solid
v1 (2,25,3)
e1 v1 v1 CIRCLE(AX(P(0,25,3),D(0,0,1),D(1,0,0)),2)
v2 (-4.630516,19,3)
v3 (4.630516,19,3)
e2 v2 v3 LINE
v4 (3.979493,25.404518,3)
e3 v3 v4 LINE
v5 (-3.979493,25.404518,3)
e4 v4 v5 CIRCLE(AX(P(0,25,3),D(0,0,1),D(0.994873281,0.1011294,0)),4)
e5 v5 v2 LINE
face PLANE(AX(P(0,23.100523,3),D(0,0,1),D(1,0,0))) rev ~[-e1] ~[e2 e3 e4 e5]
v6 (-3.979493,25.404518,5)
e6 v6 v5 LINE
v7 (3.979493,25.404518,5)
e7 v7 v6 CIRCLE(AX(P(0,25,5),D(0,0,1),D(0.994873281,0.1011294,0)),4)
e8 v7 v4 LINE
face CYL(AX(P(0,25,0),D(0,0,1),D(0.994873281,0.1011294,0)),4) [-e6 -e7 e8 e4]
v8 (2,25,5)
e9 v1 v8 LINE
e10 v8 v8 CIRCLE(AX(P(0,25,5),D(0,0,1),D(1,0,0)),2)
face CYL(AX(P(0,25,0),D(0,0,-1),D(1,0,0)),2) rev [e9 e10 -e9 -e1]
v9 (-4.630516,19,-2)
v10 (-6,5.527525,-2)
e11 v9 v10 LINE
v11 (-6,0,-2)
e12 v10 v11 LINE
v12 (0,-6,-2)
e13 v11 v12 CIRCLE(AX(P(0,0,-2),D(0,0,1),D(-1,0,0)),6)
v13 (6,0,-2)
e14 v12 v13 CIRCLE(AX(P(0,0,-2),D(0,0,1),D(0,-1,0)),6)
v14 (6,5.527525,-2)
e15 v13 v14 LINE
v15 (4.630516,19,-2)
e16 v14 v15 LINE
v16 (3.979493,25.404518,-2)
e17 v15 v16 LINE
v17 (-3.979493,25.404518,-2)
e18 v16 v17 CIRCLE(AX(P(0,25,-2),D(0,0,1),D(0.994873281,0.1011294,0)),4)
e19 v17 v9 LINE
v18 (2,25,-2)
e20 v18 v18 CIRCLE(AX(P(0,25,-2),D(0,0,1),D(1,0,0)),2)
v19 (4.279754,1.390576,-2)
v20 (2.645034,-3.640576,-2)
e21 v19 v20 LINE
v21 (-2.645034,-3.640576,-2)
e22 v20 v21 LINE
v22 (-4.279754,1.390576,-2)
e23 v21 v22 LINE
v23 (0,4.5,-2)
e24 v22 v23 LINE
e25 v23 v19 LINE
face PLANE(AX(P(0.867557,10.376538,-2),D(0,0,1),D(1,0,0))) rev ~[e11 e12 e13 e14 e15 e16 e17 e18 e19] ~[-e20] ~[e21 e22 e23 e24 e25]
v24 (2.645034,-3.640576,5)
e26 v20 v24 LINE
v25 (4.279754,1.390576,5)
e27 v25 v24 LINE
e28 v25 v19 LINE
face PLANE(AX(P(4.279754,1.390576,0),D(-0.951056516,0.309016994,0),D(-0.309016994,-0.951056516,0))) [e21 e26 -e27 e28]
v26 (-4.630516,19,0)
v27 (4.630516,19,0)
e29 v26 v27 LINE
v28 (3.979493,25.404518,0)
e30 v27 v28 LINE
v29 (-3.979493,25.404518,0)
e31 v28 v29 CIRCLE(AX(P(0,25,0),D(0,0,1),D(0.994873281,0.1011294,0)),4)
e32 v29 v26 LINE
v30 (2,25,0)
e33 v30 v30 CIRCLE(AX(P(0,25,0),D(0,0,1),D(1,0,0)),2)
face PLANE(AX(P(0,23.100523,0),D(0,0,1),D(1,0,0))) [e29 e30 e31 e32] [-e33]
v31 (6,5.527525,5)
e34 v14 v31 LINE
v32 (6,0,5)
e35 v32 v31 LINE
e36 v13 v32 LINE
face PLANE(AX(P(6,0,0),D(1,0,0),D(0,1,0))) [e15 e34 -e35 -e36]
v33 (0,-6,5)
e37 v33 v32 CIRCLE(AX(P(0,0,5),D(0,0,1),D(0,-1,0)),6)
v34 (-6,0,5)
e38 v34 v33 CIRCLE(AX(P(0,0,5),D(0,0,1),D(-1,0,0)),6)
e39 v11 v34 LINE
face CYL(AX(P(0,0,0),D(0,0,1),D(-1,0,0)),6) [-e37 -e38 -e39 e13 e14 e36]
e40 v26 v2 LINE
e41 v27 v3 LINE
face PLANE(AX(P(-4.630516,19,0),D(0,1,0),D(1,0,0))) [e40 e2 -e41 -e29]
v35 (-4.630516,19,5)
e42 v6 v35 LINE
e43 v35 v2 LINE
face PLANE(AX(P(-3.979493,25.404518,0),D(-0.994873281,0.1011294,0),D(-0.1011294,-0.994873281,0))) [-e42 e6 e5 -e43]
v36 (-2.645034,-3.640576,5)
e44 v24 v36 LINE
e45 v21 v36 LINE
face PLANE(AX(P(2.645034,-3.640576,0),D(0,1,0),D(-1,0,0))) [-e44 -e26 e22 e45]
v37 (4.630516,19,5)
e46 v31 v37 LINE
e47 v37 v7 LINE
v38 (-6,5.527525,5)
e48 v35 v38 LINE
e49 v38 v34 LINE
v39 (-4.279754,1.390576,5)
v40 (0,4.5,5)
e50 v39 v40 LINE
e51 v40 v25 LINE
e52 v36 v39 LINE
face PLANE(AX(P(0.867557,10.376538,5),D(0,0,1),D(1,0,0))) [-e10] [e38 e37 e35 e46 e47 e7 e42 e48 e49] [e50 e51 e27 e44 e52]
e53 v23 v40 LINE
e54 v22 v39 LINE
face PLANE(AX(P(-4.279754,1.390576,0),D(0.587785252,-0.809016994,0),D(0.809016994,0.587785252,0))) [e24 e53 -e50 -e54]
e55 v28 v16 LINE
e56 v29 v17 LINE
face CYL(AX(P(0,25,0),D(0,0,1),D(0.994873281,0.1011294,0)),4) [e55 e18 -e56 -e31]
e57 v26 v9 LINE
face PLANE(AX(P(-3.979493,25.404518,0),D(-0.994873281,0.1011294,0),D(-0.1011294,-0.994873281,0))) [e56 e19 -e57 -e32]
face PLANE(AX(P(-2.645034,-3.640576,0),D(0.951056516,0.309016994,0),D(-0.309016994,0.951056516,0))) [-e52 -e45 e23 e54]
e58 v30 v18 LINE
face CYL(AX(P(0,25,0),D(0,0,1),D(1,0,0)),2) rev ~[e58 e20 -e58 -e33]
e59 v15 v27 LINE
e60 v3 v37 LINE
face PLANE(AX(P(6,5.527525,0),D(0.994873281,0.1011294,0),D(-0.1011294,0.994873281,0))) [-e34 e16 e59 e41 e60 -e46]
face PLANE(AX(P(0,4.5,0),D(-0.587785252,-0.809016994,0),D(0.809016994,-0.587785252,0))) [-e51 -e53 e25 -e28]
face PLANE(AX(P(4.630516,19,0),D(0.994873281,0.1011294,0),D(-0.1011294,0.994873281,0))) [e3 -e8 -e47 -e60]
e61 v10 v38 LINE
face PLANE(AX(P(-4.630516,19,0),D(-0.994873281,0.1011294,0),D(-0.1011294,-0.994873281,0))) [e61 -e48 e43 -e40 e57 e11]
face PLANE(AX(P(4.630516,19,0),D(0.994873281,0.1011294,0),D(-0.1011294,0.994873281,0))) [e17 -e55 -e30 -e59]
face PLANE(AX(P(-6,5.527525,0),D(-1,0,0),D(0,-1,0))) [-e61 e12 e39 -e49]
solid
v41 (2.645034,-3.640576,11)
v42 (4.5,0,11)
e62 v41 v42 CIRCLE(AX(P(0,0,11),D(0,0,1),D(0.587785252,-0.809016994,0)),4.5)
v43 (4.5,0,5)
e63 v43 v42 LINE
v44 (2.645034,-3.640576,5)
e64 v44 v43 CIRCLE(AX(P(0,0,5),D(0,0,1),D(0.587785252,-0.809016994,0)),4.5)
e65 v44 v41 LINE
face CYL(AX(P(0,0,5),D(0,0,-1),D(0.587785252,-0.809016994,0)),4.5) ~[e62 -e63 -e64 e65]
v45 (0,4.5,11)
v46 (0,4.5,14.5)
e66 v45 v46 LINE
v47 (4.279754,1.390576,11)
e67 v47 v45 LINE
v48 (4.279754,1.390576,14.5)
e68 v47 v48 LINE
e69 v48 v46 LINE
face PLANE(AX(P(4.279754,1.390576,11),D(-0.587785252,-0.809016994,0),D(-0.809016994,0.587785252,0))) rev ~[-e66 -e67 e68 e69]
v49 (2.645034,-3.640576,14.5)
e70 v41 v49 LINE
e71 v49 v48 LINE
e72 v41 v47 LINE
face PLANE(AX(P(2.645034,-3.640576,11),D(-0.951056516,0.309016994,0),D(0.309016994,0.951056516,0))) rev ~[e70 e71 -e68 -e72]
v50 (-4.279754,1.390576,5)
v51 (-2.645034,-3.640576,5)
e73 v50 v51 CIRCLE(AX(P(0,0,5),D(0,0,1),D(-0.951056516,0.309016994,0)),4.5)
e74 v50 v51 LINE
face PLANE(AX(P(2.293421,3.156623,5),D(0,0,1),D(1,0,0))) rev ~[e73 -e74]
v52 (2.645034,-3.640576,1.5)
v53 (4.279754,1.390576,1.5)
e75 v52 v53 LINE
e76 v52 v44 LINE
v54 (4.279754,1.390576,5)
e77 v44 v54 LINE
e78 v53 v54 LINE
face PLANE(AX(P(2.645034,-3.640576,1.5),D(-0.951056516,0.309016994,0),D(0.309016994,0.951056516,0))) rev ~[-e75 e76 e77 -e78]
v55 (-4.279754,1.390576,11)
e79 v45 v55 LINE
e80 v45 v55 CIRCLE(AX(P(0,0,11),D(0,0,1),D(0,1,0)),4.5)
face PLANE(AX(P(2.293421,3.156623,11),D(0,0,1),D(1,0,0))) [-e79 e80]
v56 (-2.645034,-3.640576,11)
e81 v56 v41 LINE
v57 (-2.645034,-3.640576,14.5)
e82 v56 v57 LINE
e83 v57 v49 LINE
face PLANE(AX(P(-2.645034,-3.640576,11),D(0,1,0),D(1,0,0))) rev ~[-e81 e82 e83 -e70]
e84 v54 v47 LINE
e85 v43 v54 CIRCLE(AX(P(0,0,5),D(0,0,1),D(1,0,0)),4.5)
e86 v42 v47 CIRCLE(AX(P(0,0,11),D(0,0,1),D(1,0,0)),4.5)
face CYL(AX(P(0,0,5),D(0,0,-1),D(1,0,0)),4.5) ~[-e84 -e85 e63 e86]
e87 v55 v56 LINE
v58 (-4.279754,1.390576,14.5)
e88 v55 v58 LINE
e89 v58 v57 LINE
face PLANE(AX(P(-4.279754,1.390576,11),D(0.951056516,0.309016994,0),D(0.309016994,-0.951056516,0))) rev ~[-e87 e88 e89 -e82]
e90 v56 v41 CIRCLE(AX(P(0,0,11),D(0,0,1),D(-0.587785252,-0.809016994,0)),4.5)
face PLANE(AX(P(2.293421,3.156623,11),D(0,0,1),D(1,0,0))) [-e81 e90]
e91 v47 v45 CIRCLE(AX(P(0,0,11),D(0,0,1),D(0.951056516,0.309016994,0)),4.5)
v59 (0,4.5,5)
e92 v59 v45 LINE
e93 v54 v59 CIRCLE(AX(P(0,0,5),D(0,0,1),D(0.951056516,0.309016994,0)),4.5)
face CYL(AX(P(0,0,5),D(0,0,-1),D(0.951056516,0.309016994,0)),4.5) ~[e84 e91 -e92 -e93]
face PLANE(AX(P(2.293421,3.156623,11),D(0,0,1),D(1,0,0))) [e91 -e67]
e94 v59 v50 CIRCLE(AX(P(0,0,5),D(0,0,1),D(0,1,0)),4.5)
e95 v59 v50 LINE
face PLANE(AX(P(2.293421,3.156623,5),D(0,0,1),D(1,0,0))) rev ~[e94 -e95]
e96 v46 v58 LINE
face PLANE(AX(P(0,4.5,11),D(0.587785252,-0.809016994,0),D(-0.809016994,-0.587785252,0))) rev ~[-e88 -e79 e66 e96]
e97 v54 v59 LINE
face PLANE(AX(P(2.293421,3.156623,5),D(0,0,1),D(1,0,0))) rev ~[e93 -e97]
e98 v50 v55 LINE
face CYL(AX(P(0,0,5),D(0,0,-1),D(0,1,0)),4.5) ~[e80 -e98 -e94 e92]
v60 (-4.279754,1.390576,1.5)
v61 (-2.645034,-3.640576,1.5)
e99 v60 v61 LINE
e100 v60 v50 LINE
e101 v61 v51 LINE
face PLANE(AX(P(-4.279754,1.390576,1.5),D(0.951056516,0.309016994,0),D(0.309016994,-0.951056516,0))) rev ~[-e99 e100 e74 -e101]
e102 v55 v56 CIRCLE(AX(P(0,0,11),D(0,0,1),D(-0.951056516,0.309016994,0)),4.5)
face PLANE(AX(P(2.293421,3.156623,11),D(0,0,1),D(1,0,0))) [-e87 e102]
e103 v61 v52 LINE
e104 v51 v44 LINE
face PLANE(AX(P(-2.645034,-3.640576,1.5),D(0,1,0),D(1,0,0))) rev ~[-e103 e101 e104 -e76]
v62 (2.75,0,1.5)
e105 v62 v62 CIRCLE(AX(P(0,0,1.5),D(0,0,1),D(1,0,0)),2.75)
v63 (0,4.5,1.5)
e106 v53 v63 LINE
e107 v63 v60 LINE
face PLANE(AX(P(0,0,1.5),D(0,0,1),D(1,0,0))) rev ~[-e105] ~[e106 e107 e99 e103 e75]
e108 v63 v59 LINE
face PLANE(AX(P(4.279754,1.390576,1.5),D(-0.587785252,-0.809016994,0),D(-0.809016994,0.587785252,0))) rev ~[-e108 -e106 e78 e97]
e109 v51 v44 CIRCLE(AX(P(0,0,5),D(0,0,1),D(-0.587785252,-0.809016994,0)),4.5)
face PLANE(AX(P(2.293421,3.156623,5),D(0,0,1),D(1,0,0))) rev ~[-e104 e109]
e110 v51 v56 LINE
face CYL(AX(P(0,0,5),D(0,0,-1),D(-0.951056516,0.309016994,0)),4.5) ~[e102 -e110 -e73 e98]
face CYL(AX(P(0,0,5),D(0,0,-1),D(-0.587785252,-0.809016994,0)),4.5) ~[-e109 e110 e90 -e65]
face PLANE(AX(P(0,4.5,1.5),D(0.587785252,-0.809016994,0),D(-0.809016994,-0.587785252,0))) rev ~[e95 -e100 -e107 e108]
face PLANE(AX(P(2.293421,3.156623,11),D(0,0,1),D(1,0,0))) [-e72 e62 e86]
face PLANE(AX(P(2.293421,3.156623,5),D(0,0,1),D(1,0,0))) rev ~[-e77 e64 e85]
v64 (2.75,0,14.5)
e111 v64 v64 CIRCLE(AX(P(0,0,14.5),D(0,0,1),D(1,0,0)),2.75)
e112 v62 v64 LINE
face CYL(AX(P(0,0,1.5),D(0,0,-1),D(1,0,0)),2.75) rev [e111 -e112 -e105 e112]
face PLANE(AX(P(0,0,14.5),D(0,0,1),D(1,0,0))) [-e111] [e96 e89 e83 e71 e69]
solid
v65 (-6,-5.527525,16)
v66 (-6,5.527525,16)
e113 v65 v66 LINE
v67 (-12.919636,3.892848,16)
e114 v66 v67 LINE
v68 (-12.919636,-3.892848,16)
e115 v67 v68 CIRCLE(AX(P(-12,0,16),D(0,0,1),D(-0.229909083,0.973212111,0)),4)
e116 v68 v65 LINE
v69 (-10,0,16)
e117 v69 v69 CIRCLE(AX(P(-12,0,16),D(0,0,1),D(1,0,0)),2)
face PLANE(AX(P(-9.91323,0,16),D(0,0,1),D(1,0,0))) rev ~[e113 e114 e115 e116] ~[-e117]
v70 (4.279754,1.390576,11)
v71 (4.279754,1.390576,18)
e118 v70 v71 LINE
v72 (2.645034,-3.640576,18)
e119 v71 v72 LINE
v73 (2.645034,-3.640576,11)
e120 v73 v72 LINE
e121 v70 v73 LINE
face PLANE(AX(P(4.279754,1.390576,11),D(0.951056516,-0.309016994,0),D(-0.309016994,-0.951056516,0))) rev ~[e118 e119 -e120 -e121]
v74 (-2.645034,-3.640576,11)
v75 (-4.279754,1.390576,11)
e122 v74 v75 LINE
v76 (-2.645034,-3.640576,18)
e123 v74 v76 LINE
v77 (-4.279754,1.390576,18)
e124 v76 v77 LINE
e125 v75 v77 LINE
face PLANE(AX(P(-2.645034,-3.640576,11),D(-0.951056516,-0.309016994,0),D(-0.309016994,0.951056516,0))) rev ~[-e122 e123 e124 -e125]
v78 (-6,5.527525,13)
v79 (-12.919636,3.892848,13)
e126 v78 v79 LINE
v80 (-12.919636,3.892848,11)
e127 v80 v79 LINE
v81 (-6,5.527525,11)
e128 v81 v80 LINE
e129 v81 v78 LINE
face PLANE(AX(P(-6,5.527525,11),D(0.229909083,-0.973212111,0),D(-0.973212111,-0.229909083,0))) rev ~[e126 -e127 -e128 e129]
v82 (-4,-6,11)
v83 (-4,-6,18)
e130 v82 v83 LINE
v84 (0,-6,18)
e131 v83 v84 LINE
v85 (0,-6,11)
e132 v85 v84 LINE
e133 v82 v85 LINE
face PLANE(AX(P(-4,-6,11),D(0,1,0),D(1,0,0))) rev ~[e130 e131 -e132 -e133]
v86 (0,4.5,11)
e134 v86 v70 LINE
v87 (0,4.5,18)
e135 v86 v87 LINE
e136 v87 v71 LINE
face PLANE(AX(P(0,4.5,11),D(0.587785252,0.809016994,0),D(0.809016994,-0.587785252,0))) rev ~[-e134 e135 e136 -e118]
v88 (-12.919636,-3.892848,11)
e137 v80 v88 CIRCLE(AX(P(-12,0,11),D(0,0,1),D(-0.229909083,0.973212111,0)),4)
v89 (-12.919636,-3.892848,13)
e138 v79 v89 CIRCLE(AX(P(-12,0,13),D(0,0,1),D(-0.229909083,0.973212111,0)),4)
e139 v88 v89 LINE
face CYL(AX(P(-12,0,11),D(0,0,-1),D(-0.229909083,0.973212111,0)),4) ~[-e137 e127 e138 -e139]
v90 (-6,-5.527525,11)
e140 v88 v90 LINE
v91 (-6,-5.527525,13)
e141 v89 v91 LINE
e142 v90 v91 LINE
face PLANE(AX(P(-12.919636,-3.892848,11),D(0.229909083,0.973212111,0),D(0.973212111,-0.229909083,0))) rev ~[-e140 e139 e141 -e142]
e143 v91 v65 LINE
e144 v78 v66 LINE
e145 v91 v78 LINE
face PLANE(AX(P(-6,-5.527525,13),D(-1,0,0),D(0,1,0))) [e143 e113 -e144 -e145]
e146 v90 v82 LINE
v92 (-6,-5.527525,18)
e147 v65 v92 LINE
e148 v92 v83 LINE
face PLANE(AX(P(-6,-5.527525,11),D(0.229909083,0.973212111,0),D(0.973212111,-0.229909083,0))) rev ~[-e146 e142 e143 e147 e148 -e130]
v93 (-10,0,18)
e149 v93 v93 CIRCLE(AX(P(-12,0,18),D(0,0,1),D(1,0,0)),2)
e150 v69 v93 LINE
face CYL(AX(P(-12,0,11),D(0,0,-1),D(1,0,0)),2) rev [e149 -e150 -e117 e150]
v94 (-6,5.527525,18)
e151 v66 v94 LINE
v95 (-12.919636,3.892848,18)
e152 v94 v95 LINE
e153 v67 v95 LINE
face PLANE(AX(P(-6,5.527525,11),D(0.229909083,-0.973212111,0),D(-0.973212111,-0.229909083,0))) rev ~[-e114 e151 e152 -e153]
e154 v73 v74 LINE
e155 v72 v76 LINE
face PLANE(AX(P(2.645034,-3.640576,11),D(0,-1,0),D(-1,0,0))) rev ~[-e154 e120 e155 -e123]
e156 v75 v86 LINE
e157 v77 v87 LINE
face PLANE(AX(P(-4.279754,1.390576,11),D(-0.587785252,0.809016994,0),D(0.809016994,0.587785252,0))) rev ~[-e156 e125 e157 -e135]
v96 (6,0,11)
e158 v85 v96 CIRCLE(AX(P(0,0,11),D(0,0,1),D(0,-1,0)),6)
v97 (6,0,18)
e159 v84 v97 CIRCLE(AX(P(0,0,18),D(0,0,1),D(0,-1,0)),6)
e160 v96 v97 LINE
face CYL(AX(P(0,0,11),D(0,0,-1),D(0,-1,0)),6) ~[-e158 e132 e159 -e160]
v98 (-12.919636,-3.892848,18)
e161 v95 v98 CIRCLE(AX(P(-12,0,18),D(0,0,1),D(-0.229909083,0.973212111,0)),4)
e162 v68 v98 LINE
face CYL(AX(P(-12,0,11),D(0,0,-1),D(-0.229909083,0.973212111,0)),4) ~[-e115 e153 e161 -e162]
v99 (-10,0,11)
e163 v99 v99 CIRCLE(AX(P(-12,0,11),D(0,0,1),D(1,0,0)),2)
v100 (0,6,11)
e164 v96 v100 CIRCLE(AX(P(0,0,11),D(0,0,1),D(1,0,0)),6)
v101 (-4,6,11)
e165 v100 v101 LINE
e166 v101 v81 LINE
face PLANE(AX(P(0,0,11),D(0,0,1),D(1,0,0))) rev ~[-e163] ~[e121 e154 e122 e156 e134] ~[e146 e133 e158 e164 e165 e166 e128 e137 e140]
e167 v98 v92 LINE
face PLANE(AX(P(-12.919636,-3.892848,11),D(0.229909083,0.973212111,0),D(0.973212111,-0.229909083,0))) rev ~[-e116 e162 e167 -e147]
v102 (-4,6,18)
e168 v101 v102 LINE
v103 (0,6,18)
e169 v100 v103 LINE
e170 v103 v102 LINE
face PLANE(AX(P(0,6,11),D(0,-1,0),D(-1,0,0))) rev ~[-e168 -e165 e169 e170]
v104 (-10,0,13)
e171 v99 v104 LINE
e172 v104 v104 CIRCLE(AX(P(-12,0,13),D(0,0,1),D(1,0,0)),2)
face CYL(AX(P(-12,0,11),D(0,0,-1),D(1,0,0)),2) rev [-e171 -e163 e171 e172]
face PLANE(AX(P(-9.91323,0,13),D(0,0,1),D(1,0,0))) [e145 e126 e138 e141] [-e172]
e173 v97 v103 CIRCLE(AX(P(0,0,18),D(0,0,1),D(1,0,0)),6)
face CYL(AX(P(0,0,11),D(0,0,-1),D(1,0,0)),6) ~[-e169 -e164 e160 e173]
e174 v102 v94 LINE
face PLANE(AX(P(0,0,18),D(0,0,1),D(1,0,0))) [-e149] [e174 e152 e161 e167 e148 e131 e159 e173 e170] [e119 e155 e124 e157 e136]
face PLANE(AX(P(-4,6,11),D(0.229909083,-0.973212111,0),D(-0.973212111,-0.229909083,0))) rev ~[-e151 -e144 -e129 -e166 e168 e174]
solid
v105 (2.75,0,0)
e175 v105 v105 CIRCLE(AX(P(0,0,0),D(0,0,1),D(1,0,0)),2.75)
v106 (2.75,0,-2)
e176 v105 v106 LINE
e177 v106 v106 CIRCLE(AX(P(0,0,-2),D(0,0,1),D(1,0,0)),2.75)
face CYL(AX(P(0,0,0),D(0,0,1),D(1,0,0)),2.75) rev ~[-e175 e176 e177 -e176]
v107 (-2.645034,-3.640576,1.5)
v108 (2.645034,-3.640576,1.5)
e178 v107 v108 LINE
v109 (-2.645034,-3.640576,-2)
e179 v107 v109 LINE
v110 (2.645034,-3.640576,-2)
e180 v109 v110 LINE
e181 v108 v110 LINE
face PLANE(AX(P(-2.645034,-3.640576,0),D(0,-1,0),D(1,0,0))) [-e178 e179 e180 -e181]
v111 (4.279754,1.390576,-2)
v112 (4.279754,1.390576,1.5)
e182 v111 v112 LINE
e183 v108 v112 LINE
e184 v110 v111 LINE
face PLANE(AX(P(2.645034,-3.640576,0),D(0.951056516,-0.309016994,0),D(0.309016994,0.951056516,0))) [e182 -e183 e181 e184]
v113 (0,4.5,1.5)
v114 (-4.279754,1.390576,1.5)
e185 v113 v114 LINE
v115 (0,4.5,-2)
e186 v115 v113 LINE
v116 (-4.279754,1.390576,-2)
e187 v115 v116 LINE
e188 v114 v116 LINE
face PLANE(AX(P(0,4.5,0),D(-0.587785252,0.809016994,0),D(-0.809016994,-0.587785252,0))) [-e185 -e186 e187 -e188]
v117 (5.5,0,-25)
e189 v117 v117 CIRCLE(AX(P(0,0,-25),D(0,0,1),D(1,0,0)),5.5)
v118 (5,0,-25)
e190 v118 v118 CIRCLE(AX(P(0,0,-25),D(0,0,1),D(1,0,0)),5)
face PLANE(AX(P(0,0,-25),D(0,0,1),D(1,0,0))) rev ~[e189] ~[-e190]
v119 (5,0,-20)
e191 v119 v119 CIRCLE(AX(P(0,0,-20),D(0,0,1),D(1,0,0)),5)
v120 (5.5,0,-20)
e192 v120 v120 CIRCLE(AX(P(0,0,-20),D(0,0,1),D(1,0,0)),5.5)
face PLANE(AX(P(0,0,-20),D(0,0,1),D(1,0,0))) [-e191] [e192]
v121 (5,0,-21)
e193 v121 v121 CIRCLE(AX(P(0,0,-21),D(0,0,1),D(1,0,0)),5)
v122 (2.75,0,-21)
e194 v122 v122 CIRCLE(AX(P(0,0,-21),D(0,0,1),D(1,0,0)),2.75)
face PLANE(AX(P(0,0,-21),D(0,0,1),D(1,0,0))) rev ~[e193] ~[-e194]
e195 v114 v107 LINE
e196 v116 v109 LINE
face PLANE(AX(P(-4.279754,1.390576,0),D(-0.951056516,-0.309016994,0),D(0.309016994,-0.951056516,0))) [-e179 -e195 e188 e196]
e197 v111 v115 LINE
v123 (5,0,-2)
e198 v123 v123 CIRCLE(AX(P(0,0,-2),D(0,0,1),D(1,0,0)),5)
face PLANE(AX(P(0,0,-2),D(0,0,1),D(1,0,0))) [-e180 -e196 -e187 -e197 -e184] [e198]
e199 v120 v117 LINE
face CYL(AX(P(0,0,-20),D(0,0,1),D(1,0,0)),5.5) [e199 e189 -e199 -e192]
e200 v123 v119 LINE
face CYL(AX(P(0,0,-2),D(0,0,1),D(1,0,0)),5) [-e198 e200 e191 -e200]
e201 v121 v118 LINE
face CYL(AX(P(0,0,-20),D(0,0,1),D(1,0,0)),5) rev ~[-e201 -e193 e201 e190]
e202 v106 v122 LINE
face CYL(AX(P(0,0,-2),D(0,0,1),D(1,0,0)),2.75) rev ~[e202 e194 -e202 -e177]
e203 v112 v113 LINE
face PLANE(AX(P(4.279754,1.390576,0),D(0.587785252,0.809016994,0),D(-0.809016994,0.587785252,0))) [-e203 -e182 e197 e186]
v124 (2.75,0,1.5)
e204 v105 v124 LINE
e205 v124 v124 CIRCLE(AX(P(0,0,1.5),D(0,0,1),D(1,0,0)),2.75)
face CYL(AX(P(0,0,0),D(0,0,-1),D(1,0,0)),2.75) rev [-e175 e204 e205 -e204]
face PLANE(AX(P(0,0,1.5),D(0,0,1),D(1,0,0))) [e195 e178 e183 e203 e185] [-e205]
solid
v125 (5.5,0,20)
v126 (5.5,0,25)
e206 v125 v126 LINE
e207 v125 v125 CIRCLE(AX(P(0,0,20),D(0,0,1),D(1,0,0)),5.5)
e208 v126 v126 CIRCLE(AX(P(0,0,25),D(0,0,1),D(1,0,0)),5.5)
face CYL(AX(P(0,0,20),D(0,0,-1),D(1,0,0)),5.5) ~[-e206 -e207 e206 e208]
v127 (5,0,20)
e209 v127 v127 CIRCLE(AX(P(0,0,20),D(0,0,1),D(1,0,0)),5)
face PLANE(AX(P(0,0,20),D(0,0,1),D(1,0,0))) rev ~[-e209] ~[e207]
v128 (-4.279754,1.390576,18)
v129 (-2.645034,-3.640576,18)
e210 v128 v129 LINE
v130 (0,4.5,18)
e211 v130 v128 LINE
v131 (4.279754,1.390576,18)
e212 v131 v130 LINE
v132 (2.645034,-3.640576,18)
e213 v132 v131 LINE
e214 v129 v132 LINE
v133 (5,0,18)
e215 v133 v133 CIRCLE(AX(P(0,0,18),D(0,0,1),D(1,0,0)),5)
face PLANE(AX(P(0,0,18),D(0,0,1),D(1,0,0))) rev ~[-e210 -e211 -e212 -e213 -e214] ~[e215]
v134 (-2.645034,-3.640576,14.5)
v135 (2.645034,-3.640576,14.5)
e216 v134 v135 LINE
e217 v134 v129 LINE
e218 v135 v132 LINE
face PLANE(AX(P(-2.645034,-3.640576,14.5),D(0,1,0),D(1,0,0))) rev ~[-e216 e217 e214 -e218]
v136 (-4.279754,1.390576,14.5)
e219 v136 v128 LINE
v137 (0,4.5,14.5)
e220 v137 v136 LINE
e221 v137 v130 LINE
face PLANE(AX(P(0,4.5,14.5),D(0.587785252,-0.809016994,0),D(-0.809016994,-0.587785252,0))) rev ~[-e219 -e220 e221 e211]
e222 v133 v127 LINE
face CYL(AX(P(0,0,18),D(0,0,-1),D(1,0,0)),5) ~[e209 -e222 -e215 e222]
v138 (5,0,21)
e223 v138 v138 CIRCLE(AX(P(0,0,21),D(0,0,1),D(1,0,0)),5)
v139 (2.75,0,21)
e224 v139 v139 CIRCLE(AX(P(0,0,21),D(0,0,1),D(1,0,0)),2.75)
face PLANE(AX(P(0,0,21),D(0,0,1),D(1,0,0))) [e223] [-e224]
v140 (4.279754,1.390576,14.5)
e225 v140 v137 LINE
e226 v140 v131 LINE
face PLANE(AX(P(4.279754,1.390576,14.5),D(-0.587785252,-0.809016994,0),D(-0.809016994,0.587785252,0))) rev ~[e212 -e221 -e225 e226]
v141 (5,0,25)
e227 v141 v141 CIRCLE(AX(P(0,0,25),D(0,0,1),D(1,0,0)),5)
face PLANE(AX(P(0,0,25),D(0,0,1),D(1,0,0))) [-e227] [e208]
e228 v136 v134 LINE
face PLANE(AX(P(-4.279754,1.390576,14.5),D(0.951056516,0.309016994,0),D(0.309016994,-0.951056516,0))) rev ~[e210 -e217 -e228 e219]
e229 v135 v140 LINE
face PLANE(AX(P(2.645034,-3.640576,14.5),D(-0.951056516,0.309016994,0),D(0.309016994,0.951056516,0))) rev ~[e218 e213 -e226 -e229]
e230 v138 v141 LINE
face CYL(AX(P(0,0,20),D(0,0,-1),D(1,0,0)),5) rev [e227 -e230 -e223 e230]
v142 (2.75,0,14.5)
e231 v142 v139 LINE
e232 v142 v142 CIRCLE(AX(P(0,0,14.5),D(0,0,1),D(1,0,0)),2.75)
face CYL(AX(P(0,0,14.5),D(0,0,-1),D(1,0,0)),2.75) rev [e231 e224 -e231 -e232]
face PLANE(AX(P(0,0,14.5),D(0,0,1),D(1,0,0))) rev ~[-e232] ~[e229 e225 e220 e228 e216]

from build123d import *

# Parameters (mm, degrees)
F1_START       = 20
F0_R           = 5.5
F0_R_2         = 5
F1_DEPTH       = 5
F2_START       = 18
F0_R_3         = 2.75
F2_DEPTH       = 3
F3_START       = 14.5
F3_DEPTH       = 3.5
F4_START       = 11
F0_R_4         = 2
F4_DEPTH       = 7
F5_START       = 13
F5_DEPTH       = 3
F6_START       = 11
F6_DEPTH       = 3.5
F7_START       = 5
F7_DEPTH       = 6
F8_START       = 1.5
F8_DEPTH       = 3.5
F9_DEPTH       = 5
F9_DEPTH_BACK  = 2
F10_DEPTH      = 3
F11_DEPTH      = 1.5
F11_DEPTH_BACK = 2
F12_START      = -2
F12_DEPTH      = 19
F13_START      = -20
F13_DEPTH      = 5


# Not quite as in the source:
# - a feature names something its author has since deleted; it is built from what else it names


with BuildPart() as f1:
    # F0 (on Top) → F1 (new body)
    with BuildSketch(Plane.XY.offset(F1_START)):
        Circle(F0_R)
        Circle(F0_R_2, mode=Mode.SUBTRACT)
    extrude(amount=F1_DEPTH)

    # F0 (on Top) → F2 (join)
    with BuildSketch(Plane.XY.offset(F2_START)):
        Circle(F0_R_2)
        with BuildLine():
            ThreePointArc((4.2797543233, 1.3905764747), (4.4445975327, 0.7039550927), (4.5, 0))
            ThreePointArc((4.5, 0), (4.0095293588, -2.0429572488), (2.6450336353, -3.6405764747))
            ThreePointArc((2.6450336353, -3.6405764747), (0, -4.5), (-2.6450336353, -3.6405764747))
            ThreePointArc((-2.6450336353, -3.6405764747), (-4.2797543233, -1.3905764747), (-4.2797543233, 1.3905764747))
            ThreePointArc((-4.2797543233, 1.3905764747), (-2.6450336353, 3.6405764747), (0, 4.5))
            ThreePointArc((0, 4.5), (2.6450336353, 3.6405764747), (4.2797543233, 1.3905764747))
        make_face(mode=Mode.SUBTRACT)
        Polygon((2.6450336353, -3.6405764747), (4.2797543233, 1.3905764747), (0, 4.5), (-4.2797543233, 1.3905764747), (-2.6450336353, -3.6405764747), align=None)
        Circle(F0_R_3, mode=Mode.SUBTRACT)
        with BuildLine():
            Line((-4.2797543233, 1.3905764747), (0, 4.5))
            ThreePointArc((0, 4.5), (-2.6450336353, 3.6405764747), (-4.2797543233, 1.3905764747))
        make_face()
        with BuildLine():
            Line((0, 4.5), (4.2797543233, 1.3905764747))
            ThreePointArc((4.2797543233, 1.3905764747), (2.6450336353, 3.6405764747), (0, 4.5))
        make_face()
        with BuildLine():
            ThreePointArc((2.6450336353, -3.6405764747), (4.0095293588, -2.0429572488), (4.5, 0))
            ThreePointArc((4.5, 0), (4.4445975327, 0.7039550927), (4.2797543233, 1.3905764747))
            Line((4.2797543233, 1.3905764747), (2.6450336353, -3.6405764747))
        make_face()
        with BuildLine():
            ThreePointArc((-4.2797543233, 1.3905764747), (-4.2797543233, -1.3905764747), (-2.6450336353, -3.6405764747))
            Line((-2.6450336353, -3.6405764747), (-4.2797543233, 1.3905764747))
        make_face()
        with BuildLine():
            ThreePointArc((-2.6450336353, -3.6405764747), (0, -4.5), (2.6450336353, -3.6405764747))
            Line((2.6450336353, -3.6405764747), (-2.6450336353, -3.6405764747))
        make_face()
    extrude(amount=F2_DEPTH)

    # F0 (on Top) → F3 (join)
    with BuildSketch(Plane.XY.offset(F3_START)):
        Polygon((2.6450336353, -3.6405764747), (4.2797543233, 1.3905764747), (0, 4.5), (-4.2797543233, 1.3905764747), (-2.6450336353, -3.6405764747), align=None)
        Circle(F0_R_3, mode=Mode.SUBTRACT)
    extrude(amount=F3_DEPTH)


with BuildPart() as f4:
    # F0 (on Top) → F4 (new body)
    with BuildSketch(Plane.XY.offset(F4_START)):
        with BuildLine():
            ThreePointArc((6, 0), (4.2426406871, 4.2426406871), (0, 6))
            ThreePointArc((0, 6), (-4.2426406871, 4.2426406871), (-6, 0))
            ThreePointArc((-6, 0), (-4.2426406871, -4.2426406871), (0, -6))
            ThreePointArc((0, -6), (4.2426406871, -4.2426406871), (6, 0))
        make_face()
        Circle(F0_R, mode=Mode.SUBTRACT)
        Circle(F0_R)
        Circle(F0_R_2, mode=Mode.SUBTRACT)
        with BuildLine():
            Line((-6, -5.5275252317), (-6, 0))
            Line((-6, 0), (-6, 5.5275252317))
            Line((-6, 5.5275252317), (-12.9196363336, 3.8928484448))
            ThreePointArc((-12.9196363336, 3.8928484448), (-16, 0), (-12.9196363336, -3.8928484448))
            Line((-12.9196363336, -3.8928484448), (-6, -5.5275252317))
        make_face()
        with Locations((-12, 0)):
            Circle(F0_R_4, mode=Mode.SUBTRACT)
        Circle(F0_R_2)
        with BuildLine():
            ThreePointArc((4.2797543233, 1.3905764747), (4.4445975327, 0.7039550927), (4.5, 0))
            ThreePointArc((4.5, 0), (4.0095293588, -2.0429572488), (2.6450336353, -3.6405764747))
            ThreePointArc((2.6450336353, -3.6405764747), (0, -4.5), (-2.6450336353, -3.6405764747))
            ThreePointArc((-2.6450336353, -3.6405764747), (-4.2797543233, -1.3905764747), (-4.2797543233, 1.3905764747))
            ThreePointArc((-4.2797543233, 1.3905764747), (-2.6450336353, 3.6405764747), (0, 4.5))
            ThreePointArc((0, 4.5), (2.6450336353, 3.6405764747), (4.2797543233, 1.3905764747))
        make_face(mode=Mode.SUBTRACT)
        with BuildLine():
            ThreePointArc((-6, 0), (-4.2426406871, 4.2426406871), (0, 6))
            Line((0, 6), (-4, 6))
            Line((-4, 6), (-6, 5.5275252317))
            Line((-6, 5.5275252317), (-6, 0))
        make_face()
        with BuildLine():
            ThreePointArc((0, -6), (-4.2426406871, -4.2426406871), (-6, 0))
            Line((-6, 0), (-6, -5.5275252317))
            Line((-6, -5.5275252317), (-4, -6))
            Line((-4, -6), (0, -6))
        make_face()
        with BuildLine():
            ThreePointArc((-4.2797543233, 1.3905764747), (-4.2797543233, -1.3905764747), (-2.6450336353, -3.6405764747))
            Line((-2.6450336353, -3.6405764747), (-4.2797543233, 1.3905764747))
        make_face()
        with BuildLine():
            ThreePointArc((2.6450336353, -3.6405764747), (4.0095293588, -2.0429572488), (4.5, 0))
            ThreePointArc((4.5, 0), (4.4445975327, 0.7039550927), (4.2797543233, 1.3905764747))
            Line((4.2797543233, 1.3905764747), (2.6450336353, -3.6405764747))
        make_face()
        with BuildLine():
            ThreePointArc((-2.6450336353, -3.6405764747), (0, -4.5), (2.6450336353, -3.6405764747))
            Line((2.6450336353, -3.6405764747), (-2.6450336353, -3.6405764747))
        make_face()
        with BuildLine():
            Line((0, 4.5), (4.2797543233, 1.3905764747))
            ThreePointArc((4.2797543233, 1.3905764747), (2.6450336353, 3.6405764747), (0, 4.5))
        make_face()
        with BuildLine():
            Line((-4.2797543233, 1.3905764747), (0, 4.5))
            ThreePointArc((0, 4.5), (-2.6450336353, 3.6405764747), (-4.2797543233, 1.3905764747))
        make_face()
    extrude(amount=F4_DEPTH)

    # F0 (on Top) → F5 (cut)
    with BuildSketch(Plane.XY.offset(F5_START)):
        with BuildLine():
            Line((-6, -5.5275252317), (-6, 0))
            Line((-6, 0), (-6, 5.5275252317))
            Line((-6, 5.5275252317), (-12.9196363336, 3.8928484448))
            ThreePointArc((-12.9196363336, 3.8928484448), (-16, 0), (-12.9196363336, -3.8928484448))
            Line((-12.9196363336, -3.8928484448), (-6, -5.5275252317))
        make_face()
        with Locations((-12, 0)):
            Circle(F0_R_4, mode=Mode.SUBTRACT)
    extrude(amount=F5_DEPTH, mode=Mode.SUBTRACT)


with BuildPart() as f6:
    # F0 (on Top) → F6 (new body)
    with BuildSketch(Plane.XY.offset(F6_START)):
        Polygon((2.6450336353, -3.6405764747), (4.2797543233, 1.3905764747), (0, 4.5), (-4.2797543233, 1.3905764747), (-2.6450336353, -3.6405764747), align=None)
        Circle(F0_R_3, mode=Mode.SUBTRACT)
    extrude(amount=F6_DEPTH)

    # F0 (on Top) → F7 (join)
    with BuildSketch(Plane.XY.offset(F7_START)):
        with BuildLine():
            Line((0, 4.5), (4.2797543233, 1.3905764747))
            ThreePointArc((4.2797543233, 1.3905764747), (2.6450336353, 3.6405764747), (0, 4.5))
        make_face()
        Polygon((2.6450336353, -3.6405764747), (4.2797543233, 1.3905764747), (0, 4.5), (-4.2797543233, 1.3905764747), (-2.6450336353, -3.6405764747), align=None)
        Circle(F0_R_3, mode=Mode.SUBTRACT)
        with BuildLine():
            ThreePointArc((2.6450336353, -3.6405764747), (4.0095293588, -2.0429572488), (4.5, 0))
            ThreePointArc((4.5, 0), (4.4445975327, 0.7039550927), (4.2797543233, 1.3905764747))
            Line((4.2797543233, 1.3905764747), (2.6450336353, -3.6405764747))
        make_face()
        with BuildLine():
            Line((-4.2797543233, 1.3905764747), (0, 4.5))
            ThreePointArc((0, 4.5), (-2.6450336353, 3.6405764747), (-4.2797543233, 1.3905764747))
        make_face()
        with BuildLine():
            ThreePointArc((-2.6450336353, -3.6405764747), (0, -4.5), (2.6450336353, -3.6405764747))
            Line((2.6450336353, -3.6405764747), (-2.6450336353, -3.6405764747))
        make_face()
        with BuildLine():
            ThreePointArc((-4.2797543233, 1.3905764747), (-4.2797543233, -1.3905764747), (-2.6450336353, -3.6405764747))
            Line((-2.6450336353, -3.6405764747), (-4.2797543233, 1.3905764747))
        make_face()
    extrude(amount=F7_DEPTH)

    # F0 (on Top) → F8 (join)
    with BuildSketch(Plane.XY.offset(F8_START)):
        Polygon((2.6450336353, -3.6405764747), (4.2797543233, 1.3905764747), (0, 4.5), (-4.2797543233, 1.3905764747), (-2.6450336353, -3.6405764747), align=None)
        Circle(F0_R_3, mode=Mode.SUBTRACT)
    extrude(amount=F8_DEPTH)


with BuildPart() as f9:
    # F0 (on Top) → F9 (new body, two sides)
    with BuildSketch(Plane.XY) as f9_sk:
        with BuildLine():
            Line((-4, 6), (0, 6))
            ThreePointArc((0, 6), (4.2426406871, 4.2426406871), (6, 0))
            Line((6, 0), (6, 5.5275252317))
            Line((6, 5.5275252317), (4.6305157529, 19))
            Line((4.6305157529, 19), (-4.6305157529, 19))
            Line((-4.6305157529, 19), (-6, 5.5275252317))
            Line((-6, 5.5275252317), (-4, 6))
        make_face()
        with BuildLine():
            ThreePointArc((6, 0), (4.2426406871, 4.2426406871), (0, 6))
            ThreePointArc((0, 6), (-4.2426406871, 4.2426406871), (-6, 0))
            ThreePointArc((-6, 0), (-4.2426406871, -4.2426406871), (0, -6))
            ThreePointArc((0, -6), (4.2426406871, -4.2426406871), (6, 0))
        make_face()
        Circle(F0_R, mode=Mode.SUBTRACT)
        Circle(F0_R)
        Circle(F0_R_2, mode=Mode.SUBTRACT)
        Circle(F0_R_2)
        with BuildLine():
            ThreePointArc((4.2797543233, 1.3905764747), (4.4445975327, 0.7039550927), (4.5, 0))
            ThreePointArc((4.5, 0), (4.0095293588, -2.0429572488), (2.6450336353, -3.6405764747))
            ThreePointArc((2.6450336353, -3.6405764747), (0, -4.5), (-2.6450336353, -3.6405764747))
            ThreePointArc((-2.6450336353, -3.6405764747), (-4.2797543233, -1.3905764747), (-4.2797543233, 1.3905764747))
            ThreePointArc((-4.2797543233, 1.3905764747), (-2.6450336353, 3.6405764747), (0, 4.5))
            ThreePointArc((0, 4.5), (2.6450336353, 3.6405764747), (4.2797543233, 1.3905764747))
        make_face(mode=Mode.SUBTRACT)
        with BuildLine():
            Line((-3.9794931225, 25.4045175988), (-4.6305157529, 19))
            Line((-4.6305157529, 19), (4.6305157529, 19))
            Line((4.6305157529, 19), (3.9794931225, 25.4045175988))
            ThreePointArc((3.9794931225, 25.4045175988), (0, 29), (-3.9794931225, 25.4045175988))
        make_face()
        with Locations((0, 25)):
            Circle(F0_R_4, mode=Mode.SUBTRACT)
        with BuildLine():
            ThreePointArc((-6, 0), (-4.2426406871, 4.2426406871), (0, 6))
            Line((0, 6), (-4, 6))
            Line((-4, 6), (-6, 5.5275252317))
            Line((-6, 5.5275252317), (-6, 0))
        make_face()
        with BuildLine():
            ThreePointArc((2.6450336353, -3.6405764747), (4.0095293588, -2.0429572488), (4.5, 0))
            ThreePointArc((4.5, 0), (4.4445975327, 0.7039550927), (4.2797543233, 1.3905764747))
            Line((4.2797543233, 1.3905764747), (2.6450336353, -3.6405764747))
        make_face()
        with BuildLine():
            ThreePointArc((-4.2797543233, 1.3905764747), (-4.2797543233, -1.3905764747), (-2.6450336353, -3.6405764747))
            Line((-2.6450336353, -3.6405764747), (-4.2797543233, 1.3905764747))
        make_face()
        with BuildLine():
            Line((-4.2797543233, 1.3905764747), (0, 4.5))
            ThreePointArc((0, 4.5), (-2.6450336353, 3.6405764747), (-4.2797543233, 1.3905764747))
        make_face()
        with BuildLine():
            ThreePointArc((-2.6450336353, -3.6405764747), (0, -4.5), (2.6450336353, -3.6405764747))
            Line((2.6450336353, -3.6405764747), (-2.6450336353, -3.6405764747))
        make_face()
        with BuildLine():
            Line((0, 4.5), (4.2797543233, 1.3905764747))
            ThreePointArc((4.2797543233, 1.3905764747), (2.6450336353, 3.6405764747), (0, 4.5))
        make_face()
    extrude(amount=F9_DEPTH)
    extrude(f9_sk.sketch, amount=-F9_DEPTH_BACK)

    # F0 (on Top) → F10 (cut)
    with BuildSketch(Plane.XY):
        with BuildLine():
            Line((-3.9794931225, 25.4045175988), (-4.6305157529, 19))
            Line((-4.6305157529, 19), (4.6305157529, 19))
            Line((4.6305157529, 19), (3.9794931225, 25.4045175988))
            ThreePointArc((3.9794931225, 25.4045175988), (0, 29), (-3.9794931225, 25.4045175988))
        make_face()
        with Locations((0, 25)):
            Circle(F0_R_4, mode=Mode.SUBTRACT)
    extrude(amount=F10_DEPTH, mode=Mode.SUBTRACT)


with BuildPart() as f11:
    # F0 (on Top) → F11 (new body, two sides)
    with BuildSketch(Plane.XY) as f11_sk:
        Polygon((2.6450336353, -3.6405764747), (4.2797543233, 1.3905764747), (0, 4.5), (-4.2797543233, 1.3905764747), (-2.6450336353, -3.6405764747), align=None)
        Circle(F0_R_3, mode=Mode.SUBTRACT)
    extrude(amount=F11_DEPTH)
    extrude(f11_sk.sketch, amount=-F11_DEPTH_BACK)

    # F0 (on Top) → F12 (join)
    with BuildSketch(Plane.XY.offset(F12_START)):
        Circle(F0_R_2)
        with BuildLine():
            ThreePointArc((4.2797543233, 1.3905764747), (4.4445975327, 0.7039550927), (4.5, 0))
            ThreePointArc((4.5, 0), (4.0095293588, -2.0429572488), (2.6450336353, -3.6405764747))
            ThreePointArc((2.6450336353, -3.6405764747), (0, -4.5), (-2.6450336353, -3.6405764747))
            ThreePointArc((-2.6450336353, -3.6405764747), (-4.2797543233, -1.3905764747), (-4.2797543233, 1.3905764747))
            ThreePointArc((-4.2797543233, 1.3905764747), (-2.6450336353, 3.6405764747), (0, 4.5))
            ThreePointArc((0, 4.5), (2.6450336353, 3.6405764747), (4.2797543233, 1.3905764747))
        make_face(mode=Mode.SUBTRACT)
        Polygon((2.6450336353, -3.6405764747), (4.2797543233, 1.3905764747), (0, 4.5), (-4.2797543233, 1.3905764747), (-2.6450336353, -3.6405764747), align=None)
        Circle(F0_R_3, mode=Mode.SUBTRACT)
        with BuildLine():
            ThreePointArc((-2.6450336353, -3.6405764747), (0, -4.5), (2.6450336353, -3.6405764747))
            Line((2.6450336353, -3.6405764747), (-2.6450336353, -3.6405764747))
        make_face()
        with BuildLine():
            Line((-4.2797543233, 1.3905764747), (0, 4.5))
            ThreePointArc((0, 4.5), (-2.6450336353, 3.6405764747), (-4.2797543233, 1.3905764747))
        make_face()
        with BuildLine():
            ThreePointArc((-4.2797543233, 1.3905764747), (-4.2797543233, -1.3905764747), (-2.6450336353, -3.6405764747))
            Line((-2.6450336353, -3.6405764747), (-4.2797543233, 1.3905764747))
        make_face()
        with BuildLine():
            Line((0, 4.5), (4.2797543233, 1.3905764747))
            ThreePointArc((4.2797543233, 1.3905764747), (2.6450336353, 3.6405764747), (0, 4.5))
        make_face()
        with BuildLine():
            ThreePointArc((2.6450336353, -3.6405764747), (4.0095293588, -2.0429572488), (4.5, 0))
            ThreePointArc((4.5, 0), (4.4445975327, 0.7039550927), (4.2797543233, 1.3905764747))
            Line((4.2797543233, 1.3905764747), (2.6450336353, -3.6405764747))
        make_face()
    extrude(amount=-F12_DEPTH)

    # F0 (on Top) → F13 (join)
    with BuildSketch(Plane.XY.offset(F13_START)):
        Circle(F0_R)
        Circle(F0_R_2, mode=Mode.SUBTRACT)
    extrude(amount=-F13_DEPTH)


solid = Compound([f1.part, f4.part, f6.part, f9.part, f11.part])
